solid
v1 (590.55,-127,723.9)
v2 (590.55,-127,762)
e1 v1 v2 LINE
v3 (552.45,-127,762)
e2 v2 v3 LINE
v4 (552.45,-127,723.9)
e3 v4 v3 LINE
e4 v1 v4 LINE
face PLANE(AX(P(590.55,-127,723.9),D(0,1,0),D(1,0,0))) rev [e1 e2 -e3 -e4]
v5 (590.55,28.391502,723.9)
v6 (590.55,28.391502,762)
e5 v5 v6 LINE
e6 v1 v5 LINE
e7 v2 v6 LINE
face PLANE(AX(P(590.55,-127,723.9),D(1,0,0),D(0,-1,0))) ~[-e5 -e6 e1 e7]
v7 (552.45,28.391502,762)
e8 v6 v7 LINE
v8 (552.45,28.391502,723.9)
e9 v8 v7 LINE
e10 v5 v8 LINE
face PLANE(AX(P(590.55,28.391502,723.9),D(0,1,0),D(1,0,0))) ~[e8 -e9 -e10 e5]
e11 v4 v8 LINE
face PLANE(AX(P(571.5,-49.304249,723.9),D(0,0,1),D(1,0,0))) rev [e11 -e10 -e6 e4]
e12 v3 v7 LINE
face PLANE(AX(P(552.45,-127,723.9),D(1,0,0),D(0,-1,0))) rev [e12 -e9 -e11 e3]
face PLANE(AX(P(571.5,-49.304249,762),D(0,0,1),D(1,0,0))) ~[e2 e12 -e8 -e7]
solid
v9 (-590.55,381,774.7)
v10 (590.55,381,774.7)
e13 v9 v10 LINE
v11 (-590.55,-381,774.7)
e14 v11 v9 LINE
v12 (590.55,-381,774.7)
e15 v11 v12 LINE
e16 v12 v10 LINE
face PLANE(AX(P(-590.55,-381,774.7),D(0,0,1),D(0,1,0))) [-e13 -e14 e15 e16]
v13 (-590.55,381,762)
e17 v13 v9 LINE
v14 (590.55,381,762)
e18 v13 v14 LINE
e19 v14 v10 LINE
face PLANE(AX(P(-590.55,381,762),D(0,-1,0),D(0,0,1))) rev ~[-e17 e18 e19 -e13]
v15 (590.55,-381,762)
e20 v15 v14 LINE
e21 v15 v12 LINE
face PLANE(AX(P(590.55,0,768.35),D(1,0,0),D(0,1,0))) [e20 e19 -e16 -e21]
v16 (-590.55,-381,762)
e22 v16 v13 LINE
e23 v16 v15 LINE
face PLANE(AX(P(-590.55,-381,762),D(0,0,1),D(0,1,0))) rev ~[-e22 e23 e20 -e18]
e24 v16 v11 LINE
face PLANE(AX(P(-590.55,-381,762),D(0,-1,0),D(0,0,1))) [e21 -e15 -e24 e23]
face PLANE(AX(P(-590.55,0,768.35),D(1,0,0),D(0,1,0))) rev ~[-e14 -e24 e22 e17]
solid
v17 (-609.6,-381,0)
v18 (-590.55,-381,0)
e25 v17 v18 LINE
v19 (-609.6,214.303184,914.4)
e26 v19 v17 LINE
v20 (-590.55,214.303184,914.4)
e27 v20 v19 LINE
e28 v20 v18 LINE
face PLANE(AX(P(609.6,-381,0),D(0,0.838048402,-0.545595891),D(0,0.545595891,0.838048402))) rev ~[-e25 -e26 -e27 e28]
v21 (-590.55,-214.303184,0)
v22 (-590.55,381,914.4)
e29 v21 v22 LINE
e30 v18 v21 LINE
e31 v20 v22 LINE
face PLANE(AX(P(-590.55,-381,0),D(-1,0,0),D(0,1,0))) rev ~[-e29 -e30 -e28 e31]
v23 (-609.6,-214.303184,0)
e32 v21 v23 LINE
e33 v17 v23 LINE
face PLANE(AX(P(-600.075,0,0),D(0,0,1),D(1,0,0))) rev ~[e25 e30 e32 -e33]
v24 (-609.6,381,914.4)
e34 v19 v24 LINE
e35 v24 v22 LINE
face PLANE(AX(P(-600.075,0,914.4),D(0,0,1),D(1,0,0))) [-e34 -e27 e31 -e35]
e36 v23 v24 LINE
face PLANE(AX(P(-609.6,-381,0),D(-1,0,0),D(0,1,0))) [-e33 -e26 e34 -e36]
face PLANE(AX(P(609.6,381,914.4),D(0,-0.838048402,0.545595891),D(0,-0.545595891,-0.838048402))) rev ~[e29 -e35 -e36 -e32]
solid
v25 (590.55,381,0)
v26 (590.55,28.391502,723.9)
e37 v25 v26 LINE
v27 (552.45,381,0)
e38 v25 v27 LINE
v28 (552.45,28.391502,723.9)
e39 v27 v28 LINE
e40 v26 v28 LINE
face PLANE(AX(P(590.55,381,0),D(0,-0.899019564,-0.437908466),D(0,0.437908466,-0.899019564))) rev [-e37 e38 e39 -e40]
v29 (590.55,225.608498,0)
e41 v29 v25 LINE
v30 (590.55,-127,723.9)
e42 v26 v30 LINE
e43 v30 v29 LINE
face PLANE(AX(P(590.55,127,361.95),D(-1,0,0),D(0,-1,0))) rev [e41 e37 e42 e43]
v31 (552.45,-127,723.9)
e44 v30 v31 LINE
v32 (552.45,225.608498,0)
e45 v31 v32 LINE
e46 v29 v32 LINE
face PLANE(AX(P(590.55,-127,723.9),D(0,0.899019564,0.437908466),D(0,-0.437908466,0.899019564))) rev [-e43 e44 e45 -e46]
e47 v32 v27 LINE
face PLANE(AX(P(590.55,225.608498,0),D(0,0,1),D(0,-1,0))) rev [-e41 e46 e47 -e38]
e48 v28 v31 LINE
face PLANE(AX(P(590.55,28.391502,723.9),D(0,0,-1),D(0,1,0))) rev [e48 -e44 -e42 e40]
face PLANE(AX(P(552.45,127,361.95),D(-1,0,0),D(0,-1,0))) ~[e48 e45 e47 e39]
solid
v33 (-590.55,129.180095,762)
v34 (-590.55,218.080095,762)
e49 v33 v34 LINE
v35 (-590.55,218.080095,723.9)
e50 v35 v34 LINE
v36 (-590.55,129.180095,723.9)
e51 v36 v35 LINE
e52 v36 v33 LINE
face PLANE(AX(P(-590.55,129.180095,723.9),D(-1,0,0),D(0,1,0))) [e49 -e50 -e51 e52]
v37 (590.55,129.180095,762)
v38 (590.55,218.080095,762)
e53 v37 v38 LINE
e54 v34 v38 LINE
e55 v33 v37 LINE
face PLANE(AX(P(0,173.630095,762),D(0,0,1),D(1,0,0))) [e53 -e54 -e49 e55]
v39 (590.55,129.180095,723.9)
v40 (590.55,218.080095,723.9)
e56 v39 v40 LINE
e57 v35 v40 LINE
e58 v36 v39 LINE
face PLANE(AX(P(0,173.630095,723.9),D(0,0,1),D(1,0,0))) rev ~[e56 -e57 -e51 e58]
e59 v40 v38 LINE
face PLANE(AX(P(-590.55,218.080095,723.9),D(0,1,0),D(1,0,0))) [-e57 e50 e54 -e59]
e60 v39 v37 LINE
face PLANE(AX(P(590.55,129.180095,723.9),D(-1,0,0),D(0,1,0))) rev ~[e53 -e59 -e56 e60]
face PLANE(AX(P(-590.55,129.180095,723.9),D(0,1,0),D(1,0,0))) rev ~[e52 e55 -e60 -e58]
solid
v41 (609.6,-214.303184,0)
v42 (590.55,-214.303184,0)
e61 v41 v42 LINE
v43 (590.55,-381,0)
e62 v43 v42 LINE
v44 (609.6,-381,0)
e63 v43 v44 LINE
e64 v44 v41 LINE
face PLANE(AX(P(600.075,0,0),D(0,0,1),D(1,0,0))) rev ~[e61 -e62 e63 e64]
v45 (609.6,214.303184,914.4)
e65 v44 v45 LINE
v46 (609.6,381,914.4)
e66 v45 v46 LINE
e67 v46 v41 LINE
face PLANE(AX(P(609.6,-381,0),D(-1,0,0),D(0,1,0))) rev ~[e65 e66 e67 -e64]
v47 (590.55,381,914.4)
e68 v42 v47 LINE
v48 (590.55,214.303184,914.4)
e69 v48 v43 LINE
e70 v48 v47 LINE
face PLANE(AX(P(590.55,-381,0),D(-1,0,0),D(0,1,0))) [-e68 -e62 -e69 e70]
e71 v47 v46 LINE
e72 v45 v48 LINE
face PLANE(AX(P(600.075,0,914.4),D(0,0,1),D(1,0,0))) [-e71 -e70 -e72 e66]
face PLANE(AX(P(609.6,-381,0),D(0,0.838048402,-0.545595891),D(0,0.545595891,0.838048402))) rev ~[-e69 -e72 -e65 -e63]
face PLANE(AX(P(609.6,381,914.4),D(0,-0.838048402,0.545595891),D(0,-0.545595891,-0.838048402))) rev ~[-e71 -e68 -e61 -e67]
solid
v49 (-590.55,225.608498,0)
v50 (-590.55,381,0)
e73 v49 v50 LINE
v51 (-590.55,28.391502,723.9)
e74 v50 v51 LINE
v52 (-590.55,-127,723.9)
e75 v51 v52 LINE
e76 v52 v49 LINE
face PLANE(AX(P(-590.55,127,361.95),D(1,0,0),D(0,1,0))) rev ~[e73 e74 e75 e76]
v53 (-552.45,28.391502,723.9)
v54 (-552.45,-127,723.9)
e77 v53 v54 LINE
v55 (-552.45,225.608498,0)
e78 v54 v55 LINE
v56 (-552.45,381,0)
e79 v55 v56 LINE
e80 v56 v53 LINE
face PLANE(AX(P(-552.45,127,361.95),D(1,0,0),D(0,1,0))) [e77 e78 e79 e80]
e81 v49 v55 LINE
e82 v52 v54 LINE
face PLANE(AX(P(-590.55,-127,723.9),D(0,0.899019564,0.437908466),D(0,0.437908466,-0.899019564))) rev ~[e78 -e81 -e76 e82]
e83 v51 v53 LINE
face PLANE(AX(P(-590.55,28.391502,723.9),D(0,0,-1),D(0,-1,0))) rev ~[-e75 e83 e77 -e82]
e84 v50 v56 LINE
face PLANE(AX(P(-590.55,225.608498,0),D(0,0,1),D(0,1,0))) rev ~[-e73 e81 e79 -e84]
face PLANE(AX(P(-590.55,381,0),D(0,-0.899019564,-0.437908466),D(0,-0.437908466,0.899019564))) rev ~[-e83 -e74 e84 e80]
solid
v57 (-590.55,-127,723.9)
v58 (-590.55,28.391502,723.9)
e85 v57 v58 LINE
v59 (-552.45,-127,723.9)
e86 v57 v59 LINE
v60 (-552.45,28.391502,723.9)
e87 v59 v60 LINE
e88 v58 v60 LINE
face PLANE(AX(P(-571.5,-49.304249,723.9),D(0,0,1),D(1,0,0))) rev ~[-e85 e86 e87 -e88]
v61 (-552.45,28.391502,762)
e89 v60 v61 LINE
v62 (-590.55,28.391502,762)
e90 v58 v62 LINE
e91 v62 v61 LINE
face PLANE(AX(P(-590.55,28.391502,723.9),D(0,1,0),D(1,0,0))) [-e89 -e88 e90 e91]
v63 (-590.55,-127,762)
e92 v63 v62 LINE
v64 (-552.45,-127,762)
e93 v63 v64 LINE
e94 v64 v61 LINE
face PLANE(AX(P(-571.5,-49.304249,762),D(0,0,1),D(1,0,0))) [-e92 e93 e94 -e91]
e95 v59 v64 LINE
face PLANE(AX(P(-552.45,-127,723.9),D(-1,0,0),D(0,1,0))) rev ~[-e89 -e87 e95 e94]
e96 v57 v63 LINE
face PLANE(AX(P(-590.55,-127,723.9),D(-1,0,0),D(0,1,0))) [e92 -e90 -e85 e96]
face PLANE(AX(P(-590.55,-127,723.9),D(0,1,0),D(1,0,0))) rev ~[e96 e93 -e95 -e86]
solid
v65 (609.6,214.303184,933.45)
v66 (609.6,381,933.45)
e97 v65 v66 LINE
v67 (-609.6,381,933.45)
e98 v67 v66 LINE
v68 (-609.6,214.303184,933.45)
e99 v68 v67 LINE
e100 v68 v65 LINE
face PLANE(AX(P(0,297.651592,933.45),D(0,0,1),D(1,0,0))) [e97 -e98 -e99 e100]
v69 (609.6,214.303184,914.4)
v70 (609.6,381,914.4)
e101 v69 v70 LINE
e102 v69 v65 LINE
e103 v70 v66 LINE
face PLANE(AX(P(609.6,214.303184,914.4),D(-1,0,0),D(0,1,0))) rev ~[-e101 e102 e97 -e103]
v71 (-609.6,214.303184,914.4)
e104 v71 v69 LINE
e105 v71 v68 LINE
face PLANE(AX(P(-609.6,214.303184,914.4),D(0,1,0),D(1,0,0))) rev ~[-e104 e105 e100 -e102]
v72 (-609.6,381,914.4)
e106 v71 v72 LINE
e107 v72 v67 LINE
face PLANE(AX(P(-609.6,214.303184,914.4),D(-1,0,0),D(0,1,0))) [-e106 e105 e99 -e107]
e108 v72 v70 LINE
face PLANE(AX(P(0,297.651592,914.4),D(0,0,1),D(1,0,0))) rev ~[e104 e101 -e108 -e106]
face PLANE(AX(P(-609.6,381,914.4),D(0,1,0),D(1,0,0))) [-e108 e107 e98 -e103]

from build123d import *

# Parameters (mm, degrees)
F0_W      = 19.05
F0_H      = 762
F1_DEPTH  = 914.4
F3_DEPTH  = 1219.201
F4_W      = 1219.2
F4_H      = 166.6968156723
F5_DEPTH  = 19.05
F7_DEPTH  = 38.1
F8_W      = 38.1
F8_H      = 155.3915016532
F9_DEPTH  = 38.1
F8_W_2    = 1181.1
F8_H_2    = 88.9
F11_W     = 762
F11_H     = 12.7
F12_DEPTH = 1181.1


with BuildPart() as f1:
    # F0 (on Top) → F1 (new body)
    with BuildSketch(Plane.XY):
        with Locations((-600.075, 0)):
            Rectangle(F0_W, F0_H)
    extrude(amount=F1_DEPTH)


with BuildPart() as f1b:
    # F0 (on Top) → F1, piece 2 (new body)
    with BuildSketch(Plane.XY):
        with Locations((600.075, 0)):
            Rectangle(F0_W, F0_H)
    extrude(amount=F1_DEPTH)


with BuildPart() as f3_tool:
    # F2 (on face) → F3 (new body, through all)
    with BuildSketch(Plane.YZ.offset(609.6)):
        Polygon((381, 914.4), (-214.3031843277, 0), (381, 0), align=None)
        Polygon((-381, 0), (214.3031843277, 914.4), (-381, 914.4), align=None)
    extrude(amount=-F3_DEPTH)


with BuildPart() as f1_1:
    add(f1.part)

    # F3: cut by f3_tool
    add(f3_tool.part, mode=Mode.SUBTRACT)


with BuildPart() as f1b_1:
    add(f1b.part)

    # F3: cut by f3_tool
    add(f3_tool.part, mode=Mode.SUBTRACT)


with BuildPart() as f5:
    # F4 (on face) → F5 (new body)
    with BuildSketch(Plane.XY.offset(914.4)):
        with Locations((0, 297.6515921639)):
            Rectangle(F4_W, F4_H)
    extrude(amount=F5_DEPTH)


with BuildPart() as f7:
    # F6 (on face) → F7 (new body)
    with BuildSketch(Plane.YZ.offset(-590.55)):
        Polygon((225.6084983468, 0), (381, 0), (28.3915016532, 723.9), (-127, 723.9), align=None)
    extrude(amount=F7_DEPTH)


with BuildPart() as f9:
    # F8 (on face) → F9 (new body)
    with BuildSketch(Plane.XY.offset(723.9)):
        with Locations((-571.5, -49.3042491734)):
            Rectangle(F8_W, F8_H)
    extrude(amount=F9_DEPTH)


with BuildPart() as f9b:
    # F8 (on face) → F9, piece 2 (new body)
    with BuildSketch(Plane.XY.offset(723.9)):
        with Locations((0, 173.6300954289)):
            Rectangle(F8_W_2, F8_H_2)
    extrude(amount=F9_DEPTH)


with BuildPart() as f10_1:
    # F10: instance of F7
    add(f7.part.mirror(Plane.YZ))


with BuildPart() as f10_2:
    # F10: instance of F9
    add(f9.part.mirror(Plane.YZ))


with BuildPart() as f12:
    # F11 (on face) → F12 (new body, through all)
    with BuildSketch(Plane.YZ.offset(-590.55)):
        with Locations((0, 768.35)):
            Rectangle(F11_W, F11_H)
    extrude(amount=F12_DEPTH)


solid = Compound([f1_1.part, f1b_1.part, f5.part, f7.part, f9.part, f9b.part, f10_1.part, f10_2.part, f12.part])
